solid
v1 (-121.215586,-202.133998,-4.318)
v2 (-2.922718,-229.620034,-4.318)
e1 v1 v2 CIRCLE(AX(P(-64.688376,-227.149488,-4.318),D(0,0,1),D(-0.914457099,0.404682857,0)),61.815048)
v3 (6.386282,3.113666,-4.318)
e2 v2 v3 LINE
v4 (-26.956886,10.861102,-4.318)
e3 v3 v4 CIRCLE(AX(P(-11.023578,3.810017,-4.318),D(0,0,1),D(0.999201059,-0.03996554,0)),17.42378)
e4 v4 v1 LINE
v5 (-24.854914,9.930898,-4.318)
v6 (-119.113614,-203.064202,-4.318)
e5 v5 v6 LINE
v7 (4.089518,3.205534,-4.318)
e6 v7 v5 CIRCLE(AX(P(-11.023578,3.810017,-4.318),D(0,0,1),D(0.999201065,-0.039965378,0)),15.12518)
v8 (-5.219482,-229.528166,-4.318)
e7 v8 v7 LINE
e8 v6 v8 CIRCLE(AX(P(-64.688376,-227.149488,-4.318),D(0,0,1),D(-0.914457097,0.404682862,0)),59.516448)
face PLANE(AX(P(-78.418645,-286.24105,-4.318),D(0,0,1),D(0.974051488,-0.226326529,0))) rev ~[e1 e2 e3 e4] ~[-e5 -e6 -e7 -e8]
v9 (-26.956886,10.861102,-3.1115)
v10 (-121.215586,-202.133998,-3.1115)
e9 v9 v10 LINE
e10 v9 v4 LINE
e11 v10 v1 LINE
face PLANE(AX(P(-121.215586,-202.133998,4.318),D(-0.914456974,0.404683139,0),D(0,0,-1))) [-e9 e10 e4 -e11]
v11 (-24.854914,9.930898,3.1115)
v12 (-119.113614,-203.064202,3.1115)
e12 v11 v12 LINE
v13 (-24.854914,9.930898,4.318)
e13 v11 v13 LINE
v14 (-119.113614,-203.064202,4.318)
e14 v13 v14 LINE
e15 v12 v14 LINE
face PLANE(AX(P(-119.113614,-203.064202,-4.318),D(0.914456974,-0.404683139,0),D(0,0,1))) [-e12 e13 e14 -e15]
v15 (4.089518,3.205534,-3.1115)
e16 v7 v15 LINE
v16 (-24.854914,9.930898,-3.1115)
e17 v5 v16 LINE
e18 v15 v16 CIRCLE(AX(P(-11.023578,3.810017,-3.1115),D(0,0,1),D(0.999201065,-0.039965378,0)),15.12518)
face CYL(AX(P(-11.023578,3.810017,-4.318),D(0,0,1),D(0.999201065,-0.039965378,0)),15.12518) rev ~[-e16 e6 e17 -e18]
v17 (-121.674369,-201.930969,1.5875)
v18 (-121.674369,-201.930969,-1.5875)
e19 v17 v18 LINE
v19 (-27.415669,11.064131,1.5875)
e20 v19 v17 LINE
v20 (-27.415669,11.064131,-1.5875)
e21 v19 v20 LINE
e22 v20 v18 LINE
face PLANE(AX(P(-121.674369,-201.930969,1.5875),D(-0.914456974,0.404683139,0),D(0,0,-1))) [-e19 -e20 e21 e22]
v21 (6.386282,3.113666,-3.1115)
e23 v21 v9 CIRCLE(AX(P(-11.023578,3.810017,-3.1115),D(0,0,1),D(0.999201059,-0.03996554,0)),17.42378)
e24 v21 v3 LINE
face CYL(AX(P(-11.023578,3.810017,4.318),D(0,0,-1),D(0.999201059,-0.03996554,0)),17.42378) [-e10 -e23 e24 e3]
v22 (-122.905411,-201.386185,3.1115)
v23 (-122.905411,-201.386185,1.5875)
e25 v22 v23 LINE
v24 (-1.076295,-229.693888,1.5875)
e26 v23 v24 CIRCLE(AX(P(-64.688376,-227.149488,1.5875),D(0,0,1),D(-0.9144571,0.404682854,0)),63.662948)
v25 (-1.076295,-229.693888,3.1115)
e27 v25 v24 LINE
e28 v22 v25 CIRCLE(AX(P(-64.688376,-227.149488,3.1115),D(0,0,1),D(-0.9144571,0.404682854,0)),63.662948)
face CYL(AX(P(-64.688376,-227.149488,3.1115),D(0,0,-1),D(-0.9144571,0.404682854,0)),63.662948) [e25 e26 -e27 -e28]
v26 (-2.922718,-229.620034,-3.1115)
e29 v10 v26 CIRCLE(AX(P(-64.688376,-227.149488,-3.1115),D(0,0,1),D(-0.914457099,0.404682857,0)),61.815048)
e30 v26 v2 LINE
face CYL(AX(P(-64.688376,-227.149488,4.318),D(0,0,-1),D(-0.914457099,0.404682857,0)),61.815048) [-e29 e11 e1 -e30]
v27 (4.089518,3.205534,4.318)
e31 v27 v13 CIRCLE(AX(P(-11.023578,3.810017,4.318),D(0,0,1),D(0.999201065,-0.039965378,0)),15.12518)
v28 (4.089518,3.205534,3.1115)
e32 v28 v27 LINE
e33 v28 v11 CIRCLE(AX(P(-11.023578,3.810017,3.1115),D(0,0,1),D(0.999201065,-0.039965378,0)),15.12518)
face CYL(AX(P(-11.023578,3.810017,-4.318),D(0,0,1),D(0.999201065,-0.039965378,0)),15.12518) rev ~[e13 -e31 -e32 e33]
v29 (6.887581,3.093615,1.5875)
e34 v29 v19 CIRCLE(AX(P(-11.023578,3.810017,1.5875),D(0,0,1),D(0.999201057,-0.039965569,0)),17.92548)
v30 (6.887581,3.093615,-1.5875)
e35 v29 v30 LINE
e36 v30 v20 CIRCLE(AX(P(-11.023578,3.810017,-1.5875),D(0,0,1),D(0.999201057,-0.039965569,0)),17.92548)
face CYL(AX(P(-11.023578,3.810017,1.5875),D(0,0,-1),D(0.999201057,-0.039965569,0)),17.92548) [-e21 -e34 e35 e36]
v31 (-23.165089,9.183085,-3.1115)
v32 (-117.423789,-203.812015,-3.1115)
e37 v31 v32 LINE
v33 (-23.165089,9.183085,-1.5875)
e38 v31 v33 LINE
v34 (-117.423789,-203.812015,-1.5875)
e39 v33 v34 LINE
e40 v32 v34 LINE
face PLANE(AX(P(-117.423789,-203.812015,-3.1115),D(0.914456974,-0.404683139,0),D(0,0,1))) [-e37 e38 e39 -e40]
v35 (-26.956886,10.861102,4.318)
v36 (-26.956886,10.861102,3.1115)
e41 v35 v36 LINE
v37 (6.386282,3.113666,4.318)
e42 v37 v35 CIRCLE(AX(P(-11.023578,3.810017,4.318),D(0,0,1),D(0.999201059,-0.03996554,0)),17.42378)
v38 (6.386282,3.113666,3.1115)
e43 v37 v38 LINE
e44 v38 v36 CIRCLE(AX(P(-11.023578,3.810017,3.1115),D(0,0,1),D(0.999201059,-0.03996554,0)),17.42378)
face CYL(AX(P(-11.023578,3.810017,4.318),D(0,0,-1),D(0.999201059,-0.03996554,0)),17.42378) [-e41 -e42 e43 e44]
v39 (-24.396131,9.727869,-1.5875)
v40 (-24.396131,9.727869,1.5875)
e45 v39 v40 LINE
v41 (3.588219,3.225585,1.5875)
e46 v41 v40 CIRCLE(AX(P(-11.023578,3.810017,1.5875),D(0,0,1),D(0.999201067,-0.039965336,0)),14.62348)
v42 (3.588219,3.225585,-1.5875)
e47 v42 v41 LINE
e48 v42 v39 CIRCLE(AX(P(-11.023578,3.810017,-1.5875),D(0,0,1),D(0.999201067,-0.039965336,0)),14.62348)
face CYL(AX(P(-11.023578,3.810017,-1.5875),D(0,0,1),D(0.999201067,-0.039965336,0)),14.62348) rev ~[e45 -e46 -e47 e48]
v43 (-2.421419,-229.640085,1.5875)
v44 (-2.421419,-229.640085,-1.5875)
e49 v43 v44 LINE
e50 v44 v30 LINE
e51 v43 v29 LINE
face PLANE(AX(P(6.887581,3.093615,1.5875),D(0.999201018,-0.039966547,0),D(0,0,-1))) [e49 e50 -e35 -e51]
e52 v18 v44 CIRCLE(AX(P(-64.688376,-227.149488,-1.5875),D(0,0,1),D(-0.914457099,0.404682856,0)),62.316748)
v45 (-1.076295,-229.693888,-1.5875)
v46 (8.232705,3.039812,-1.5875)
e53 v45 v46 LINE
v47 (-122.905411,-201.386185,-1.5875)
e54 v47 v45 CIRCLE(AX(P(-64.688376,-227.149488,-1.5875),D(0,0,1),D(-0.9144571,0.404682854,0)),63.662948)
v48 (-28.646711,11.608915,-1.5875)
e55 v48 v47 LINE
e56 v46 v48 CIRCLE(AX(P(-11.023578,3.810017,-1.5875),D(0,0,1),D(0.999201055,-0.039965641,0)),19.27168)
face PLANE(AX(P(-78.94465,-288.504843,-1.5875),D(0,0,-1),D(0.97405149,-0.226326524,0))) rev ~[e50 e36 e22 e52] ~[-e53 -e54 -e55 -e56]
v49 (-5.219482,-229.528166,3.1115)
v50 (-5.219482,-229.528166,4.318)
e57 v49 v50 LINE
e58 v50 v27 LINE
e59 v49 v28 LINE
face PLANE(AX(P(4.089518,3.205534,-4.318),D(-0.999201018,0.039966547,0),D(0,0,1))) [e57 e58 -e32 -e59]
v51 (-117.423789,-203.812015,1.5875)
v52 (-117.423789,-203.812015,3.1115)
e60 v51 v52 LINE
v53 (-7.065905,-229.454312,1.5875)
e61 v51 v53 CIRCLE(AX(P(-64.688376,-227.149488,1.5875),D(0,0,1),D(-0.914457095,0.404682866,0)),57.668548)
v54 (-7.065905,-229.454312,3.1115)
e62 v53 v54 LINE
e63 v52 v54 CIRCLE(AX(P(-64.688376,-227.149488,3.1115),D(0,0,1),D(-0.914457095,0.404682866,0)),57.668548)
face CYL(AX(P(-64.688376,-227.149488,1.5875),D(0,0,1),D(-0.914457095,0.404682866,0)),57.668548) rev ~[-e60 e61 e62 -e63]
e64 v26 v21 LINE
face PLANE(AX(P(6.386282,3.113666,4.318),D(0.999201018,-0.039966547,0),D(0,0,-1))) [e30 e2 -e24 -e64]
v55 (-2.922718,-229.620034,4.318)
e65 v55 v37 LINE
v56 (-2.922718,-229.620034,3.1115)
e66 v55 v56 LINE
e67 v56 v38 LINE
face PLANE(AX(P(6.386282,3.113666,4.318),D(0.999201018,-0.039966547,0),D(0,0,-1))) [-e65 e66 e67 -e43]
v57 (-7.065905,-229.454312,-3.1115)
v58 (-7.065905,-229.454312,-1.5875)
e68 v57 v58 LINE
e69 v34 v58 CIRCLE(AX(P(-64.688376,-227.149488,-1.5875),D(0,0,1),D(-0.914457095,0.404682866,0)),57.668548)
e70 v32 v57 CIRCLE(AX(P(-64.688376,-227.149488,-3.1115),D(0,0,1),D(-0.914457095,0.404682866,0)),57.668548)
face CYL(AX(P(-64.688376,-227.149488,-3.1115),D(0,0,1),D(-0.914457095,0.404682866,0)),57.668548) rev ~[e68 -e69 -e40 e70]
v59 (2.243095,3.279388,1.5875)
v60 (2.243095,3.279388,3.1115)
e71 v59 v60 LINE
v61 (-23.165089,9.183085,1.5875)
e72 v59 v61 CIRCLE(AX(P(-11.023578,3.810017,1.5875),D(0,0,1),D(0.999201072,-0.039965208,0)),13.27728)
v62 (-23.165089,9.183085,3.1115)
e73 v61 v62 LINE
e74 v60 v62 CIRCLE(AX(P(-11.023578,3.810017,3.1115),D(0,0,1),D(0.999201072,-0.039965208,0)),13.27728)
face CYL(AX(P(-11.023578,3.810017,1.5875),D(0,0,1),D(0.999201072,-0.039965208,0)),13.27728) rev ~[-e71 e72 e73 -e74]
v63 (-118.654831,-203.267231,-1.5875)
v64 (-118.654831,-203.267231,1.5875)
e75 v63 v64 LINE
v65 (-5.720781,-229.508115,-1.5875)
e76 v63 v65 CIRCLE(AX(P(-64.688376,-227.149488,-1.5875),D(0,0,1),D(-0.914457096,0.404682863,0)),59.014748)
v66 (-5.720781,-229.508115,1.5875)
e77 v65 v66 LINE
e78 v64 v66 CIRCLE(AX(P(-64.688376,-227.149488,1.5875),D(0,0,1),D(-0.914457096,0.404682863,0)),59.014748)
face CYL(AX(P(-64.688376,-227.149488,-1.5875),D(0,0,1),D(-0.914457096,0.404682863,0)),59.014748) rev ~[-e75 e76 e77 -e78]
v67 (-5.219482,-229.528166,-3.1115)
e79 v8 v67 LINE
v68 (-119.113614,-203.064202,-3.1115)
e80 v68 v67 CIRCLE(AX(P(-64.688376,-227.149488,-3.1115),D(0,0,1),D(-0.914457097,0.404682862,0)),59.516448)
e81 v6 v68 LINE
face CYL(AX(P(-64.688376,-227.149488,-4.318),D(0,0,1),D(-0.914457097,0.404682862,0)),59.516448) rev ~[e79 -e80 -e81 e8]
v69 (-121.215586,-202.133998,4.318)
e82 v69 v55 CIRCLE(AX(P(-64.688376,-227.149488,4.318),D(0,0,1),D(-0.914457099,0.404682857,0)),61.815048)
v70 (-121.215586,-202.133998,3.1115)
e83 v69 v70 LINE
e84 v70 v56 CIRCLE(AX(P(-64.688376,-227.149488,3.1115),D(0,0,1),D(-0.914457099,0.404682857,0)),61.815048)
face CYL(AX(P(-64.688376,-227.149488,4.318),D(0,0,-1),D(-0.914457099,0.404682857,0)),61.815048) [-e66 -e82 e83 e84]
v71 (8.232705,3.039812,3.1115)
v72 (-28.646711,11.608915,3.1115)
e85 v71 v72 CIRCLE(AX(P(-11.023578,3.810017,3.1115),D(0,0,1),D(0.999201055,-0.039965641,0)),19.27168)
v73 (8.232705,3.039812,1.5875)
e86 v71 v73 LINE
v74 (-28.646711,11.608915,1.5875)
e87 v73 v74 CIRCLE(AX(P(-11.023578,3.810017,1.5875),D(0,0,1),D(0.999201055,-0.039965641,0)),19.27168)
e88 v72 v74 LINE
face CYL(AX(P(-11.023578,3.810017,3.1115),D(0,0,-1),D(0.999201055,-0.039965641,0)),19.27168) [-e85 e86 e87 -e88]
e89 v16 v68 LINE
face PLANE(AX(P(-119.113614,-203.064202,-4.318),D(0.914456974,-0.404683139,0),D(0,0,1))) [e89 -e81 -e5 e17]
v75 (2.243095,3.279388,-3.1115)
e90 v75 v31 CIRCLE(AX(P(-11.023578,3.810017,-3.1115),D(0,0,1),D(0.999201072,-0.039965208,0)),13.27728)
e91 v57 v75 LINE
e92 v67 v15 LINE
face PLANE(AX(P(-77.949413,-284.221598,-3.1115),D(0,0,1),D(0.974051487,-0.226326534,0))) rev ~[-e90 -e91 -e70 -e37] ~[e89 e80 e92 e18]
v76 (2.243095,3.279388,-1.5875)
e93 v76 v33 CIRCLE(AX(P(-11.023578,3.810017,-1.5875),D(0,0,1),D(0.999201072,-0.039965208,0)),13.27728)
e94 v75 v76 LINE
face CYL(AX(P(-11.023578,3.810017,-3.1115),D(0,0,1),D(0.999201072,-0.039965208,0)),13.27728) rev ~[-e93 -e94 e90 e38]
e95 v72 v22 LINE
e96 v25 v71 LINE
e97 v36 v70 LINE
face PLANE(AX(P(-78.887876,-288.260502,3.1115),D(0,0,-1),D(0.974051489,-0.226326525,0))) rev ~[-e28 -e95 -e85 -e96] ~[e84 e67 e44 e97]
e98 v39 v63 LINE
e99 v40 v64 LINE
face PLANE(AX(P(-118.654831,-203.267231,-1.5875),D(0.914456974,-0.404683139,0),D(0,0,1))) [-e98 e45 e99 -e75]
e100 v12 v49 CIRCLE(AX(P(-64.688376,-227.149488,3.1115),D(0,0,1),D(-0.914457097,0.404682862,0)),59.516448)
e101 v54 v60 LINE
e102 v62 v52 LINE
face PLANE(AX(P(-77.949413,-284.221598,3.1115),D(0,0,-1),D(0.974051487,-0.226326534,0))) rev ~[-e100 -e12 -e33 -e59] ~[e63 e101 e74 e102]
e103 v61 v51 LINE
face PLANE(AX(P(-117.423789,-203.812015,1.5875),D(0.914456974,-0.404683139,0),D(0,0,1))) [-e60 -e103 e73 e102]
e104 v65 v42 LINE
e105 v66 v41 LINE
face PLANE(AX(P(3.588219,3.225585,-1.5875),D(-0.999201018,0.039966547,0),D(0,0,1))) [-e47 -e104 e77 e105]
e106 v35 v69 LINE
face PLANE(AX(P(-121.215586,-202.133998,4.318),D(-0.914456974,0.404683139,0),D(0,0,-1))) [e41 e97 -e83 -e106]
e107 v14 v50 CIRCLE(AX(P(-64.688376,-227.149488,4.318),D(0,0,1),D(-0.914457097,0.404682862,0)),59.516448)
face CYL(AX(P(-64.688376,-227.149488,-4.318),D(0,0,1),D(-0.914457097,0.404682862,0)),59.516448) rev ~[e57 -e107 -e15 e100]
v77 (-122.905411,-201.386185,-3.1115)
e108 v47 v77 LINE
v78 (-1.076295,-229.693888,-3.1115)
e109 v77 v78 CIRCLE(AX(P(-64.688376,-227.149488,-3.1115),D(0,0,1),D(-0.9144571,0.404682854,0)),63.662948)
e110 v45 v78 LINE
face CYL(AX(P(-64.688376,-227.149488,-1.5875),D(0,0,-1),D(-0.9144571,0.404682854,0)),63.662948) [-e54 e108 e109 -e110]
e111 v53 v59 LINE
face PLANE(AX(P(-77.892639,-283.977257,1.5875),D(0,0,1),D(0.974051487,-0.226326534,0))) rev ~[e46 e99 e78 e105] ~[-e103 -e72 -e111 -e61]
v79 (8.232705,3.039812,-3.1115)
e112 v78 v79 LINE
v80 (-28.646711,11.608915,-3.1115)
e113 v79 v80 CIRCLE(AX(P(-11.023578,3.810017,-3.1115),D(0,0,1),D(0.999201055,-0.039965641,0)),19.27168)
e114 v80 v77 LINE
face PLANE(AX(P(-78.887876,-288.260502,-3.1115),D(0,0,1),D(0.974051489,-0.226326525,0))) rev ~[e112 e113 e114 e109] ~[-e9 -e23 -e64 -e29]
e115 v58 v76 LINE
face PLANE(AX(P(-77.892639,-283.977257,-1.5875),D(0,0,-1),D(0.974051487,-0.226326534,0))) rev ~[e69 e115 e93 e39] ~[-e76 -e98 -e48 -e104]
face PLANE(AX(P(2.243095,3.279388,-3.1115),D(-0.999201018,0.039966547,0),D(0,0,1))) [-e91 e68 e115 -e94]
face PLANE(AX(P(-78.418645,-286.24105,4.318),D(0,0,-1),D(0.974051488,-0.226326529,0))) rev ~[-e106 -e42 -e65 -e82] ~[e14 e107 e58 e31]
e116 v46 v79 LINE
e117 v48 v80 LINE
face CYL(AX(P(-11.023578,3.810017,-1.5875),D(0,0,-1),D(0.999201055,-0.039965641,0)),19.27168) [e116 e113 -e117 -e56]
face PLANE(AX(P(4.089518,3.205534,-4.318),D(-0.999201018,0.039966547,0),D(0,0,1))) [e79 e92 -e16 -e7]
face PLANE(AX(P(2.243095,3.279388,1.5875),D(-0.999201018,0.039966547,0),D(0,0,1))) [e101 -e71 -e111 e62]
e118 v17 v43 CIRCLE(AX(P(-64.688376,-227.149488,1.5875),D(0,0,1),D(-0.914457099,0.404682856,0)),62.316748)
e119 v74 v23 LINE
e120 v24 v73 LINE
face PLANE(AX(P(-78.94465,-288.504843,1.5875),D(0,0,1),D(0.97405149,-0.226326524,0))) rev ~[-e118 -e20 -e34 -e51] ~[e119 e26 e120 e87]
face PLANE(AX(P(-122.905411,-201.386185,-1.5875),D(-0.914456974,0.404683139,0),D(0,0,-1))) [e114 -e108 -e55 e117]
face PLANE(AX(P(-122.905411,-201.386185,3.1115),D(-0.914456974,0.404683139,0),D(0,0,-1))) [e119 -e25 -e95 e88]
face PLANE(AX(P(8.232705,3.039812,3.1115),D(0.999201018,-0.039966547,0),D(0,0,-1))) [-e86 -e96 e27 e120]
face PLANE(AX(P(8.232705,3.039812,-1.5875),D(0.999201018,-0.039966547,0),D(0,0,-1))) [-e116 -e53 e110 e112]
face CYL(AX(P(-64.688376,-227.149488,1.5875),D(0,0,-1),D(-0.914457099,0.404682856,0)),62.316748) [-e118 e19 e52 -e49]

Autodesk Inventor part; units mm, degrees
ref_plane "Work Plane2" through (-64.6884, -227.1495, 0) normal (-1, 0, 0) x (0, 0, 1)
ref_plane "Work Plane3" through (-11.0236, 3.81, 0) normal (-0.52273, -0.8524983, 0) x (0, 0, 1)
sketch "Path" plane through (0, 0, 0) normal (0, 0, 1) x (1, 0, 0)
  arc A0 (-120.1646, -202.5991) -> (-4.0711, -229.5741) centre (-64.6884, -227.1495) ccw
  arc A1 (5.2379, 3.1596) -> (-25.9059, 10.396) centre (-11.0236, 3.81) ccw
  line L0 (5.2379, 3.1596) -> (-4.0711, -229.5741)
  line L1 (-120.1646, -202.5991) -> (-25.9059, 10.396)
  dimension "d31" = 5.9944
ref_plane "Section Plane" through (-4.0711, -229.5741, 0) normal (0.0399666, 0.999201, 0) x (0, 0, 1)
sketch "Section Sketch" plane through (-4.0711, -229.5741, 0) normal (0.0399666, 0.999201, 0) x (0, 0, 1)
  line L0 (-4.318, -1.1493) -> (4.318, -1.1493)
  line L1 (4.318, -1.1493) -> (4.318, 1.1493)
  line L2 (4.318, 1.1493) -> (-4.318, 1.1493)
  line L3 (-4.318, 1.1493) -> (-4.318, -1.1493)
  line L4 (-1.5875, -1.651) -> (1.5875, -1.651)
  line L5 (1.5875, -1.651) -> (1.5875, 1.651)
  line L6 (1.5875, 1.651) -> (-1.5875, 1.651)
  line L7 (-1.5875, 1.651) -> (-1.5875, -1.651)
  line L8 (-1.5875, 0) -> (1.5875, 0) construction
  line L9 (-3.1115, -2.9972) -> (-1.5875, -2.9972)
  line L10 (-1.5875, -2.9972) -> (-1.5875, 2.9972)
  line L11 (-1.5875, 2.9972) -> (-3.1115, 2.9972)
  line L12 (-3.1115, 2.9972) -> (-3.1115, -2.9972)
  line L13 (1.5875, -2.9972) -> (3.1115, -2.9972)
  line L14 (3.1115, -2.9972) -> (3.1115, 2.9972)
  line L15 (3.1115, 2.9972) -> (1.5875, 2.9972)
  line L16 (1.5875, 2.9972) -> (1.5875, -2.9972)
  line L17 (-4.318, 0) -> (4.318, 0) construction
  point P0 (0, 0)
  point P1 (0, 0)
  dimension "d21" = 2.2987
  dimension "d22" = 3.302
  dimension "d23" = 3.175
  dimension "d24" = 1.524
  dimension "d31" = 5.9944
  dimension "d32" = 8.636
sweep "Solid" add profiles "Section Sketch" path "Path"
pattern_of_one "Strand Pattern"
equation "\"d21\" = da_d2"
equation "\"d22\" = da_d1"
equation "\"d23\" = da_b1"
equation "\"d24\" = da_t1 + da_t2"
equation "\"d30\" = da_pt"
equation "\"da_p\" = 6.35"
equation "\"da_b1\" = 3.175"
equation "\"da_h2\" = 5.9944"
equation "\"da_h3\" = 5.207"
equation "\"da_d1\" = 3.302"
equation "\"da_d2\" = 2.2987"
equation "\"da_pt\" = 6.4008"
equation "\"da_b\" = 8.636"
equation "\"da_t1\" = 0.762"
equation "\"da_t2\" = 0.762"
properties part number "Roller Chain"
